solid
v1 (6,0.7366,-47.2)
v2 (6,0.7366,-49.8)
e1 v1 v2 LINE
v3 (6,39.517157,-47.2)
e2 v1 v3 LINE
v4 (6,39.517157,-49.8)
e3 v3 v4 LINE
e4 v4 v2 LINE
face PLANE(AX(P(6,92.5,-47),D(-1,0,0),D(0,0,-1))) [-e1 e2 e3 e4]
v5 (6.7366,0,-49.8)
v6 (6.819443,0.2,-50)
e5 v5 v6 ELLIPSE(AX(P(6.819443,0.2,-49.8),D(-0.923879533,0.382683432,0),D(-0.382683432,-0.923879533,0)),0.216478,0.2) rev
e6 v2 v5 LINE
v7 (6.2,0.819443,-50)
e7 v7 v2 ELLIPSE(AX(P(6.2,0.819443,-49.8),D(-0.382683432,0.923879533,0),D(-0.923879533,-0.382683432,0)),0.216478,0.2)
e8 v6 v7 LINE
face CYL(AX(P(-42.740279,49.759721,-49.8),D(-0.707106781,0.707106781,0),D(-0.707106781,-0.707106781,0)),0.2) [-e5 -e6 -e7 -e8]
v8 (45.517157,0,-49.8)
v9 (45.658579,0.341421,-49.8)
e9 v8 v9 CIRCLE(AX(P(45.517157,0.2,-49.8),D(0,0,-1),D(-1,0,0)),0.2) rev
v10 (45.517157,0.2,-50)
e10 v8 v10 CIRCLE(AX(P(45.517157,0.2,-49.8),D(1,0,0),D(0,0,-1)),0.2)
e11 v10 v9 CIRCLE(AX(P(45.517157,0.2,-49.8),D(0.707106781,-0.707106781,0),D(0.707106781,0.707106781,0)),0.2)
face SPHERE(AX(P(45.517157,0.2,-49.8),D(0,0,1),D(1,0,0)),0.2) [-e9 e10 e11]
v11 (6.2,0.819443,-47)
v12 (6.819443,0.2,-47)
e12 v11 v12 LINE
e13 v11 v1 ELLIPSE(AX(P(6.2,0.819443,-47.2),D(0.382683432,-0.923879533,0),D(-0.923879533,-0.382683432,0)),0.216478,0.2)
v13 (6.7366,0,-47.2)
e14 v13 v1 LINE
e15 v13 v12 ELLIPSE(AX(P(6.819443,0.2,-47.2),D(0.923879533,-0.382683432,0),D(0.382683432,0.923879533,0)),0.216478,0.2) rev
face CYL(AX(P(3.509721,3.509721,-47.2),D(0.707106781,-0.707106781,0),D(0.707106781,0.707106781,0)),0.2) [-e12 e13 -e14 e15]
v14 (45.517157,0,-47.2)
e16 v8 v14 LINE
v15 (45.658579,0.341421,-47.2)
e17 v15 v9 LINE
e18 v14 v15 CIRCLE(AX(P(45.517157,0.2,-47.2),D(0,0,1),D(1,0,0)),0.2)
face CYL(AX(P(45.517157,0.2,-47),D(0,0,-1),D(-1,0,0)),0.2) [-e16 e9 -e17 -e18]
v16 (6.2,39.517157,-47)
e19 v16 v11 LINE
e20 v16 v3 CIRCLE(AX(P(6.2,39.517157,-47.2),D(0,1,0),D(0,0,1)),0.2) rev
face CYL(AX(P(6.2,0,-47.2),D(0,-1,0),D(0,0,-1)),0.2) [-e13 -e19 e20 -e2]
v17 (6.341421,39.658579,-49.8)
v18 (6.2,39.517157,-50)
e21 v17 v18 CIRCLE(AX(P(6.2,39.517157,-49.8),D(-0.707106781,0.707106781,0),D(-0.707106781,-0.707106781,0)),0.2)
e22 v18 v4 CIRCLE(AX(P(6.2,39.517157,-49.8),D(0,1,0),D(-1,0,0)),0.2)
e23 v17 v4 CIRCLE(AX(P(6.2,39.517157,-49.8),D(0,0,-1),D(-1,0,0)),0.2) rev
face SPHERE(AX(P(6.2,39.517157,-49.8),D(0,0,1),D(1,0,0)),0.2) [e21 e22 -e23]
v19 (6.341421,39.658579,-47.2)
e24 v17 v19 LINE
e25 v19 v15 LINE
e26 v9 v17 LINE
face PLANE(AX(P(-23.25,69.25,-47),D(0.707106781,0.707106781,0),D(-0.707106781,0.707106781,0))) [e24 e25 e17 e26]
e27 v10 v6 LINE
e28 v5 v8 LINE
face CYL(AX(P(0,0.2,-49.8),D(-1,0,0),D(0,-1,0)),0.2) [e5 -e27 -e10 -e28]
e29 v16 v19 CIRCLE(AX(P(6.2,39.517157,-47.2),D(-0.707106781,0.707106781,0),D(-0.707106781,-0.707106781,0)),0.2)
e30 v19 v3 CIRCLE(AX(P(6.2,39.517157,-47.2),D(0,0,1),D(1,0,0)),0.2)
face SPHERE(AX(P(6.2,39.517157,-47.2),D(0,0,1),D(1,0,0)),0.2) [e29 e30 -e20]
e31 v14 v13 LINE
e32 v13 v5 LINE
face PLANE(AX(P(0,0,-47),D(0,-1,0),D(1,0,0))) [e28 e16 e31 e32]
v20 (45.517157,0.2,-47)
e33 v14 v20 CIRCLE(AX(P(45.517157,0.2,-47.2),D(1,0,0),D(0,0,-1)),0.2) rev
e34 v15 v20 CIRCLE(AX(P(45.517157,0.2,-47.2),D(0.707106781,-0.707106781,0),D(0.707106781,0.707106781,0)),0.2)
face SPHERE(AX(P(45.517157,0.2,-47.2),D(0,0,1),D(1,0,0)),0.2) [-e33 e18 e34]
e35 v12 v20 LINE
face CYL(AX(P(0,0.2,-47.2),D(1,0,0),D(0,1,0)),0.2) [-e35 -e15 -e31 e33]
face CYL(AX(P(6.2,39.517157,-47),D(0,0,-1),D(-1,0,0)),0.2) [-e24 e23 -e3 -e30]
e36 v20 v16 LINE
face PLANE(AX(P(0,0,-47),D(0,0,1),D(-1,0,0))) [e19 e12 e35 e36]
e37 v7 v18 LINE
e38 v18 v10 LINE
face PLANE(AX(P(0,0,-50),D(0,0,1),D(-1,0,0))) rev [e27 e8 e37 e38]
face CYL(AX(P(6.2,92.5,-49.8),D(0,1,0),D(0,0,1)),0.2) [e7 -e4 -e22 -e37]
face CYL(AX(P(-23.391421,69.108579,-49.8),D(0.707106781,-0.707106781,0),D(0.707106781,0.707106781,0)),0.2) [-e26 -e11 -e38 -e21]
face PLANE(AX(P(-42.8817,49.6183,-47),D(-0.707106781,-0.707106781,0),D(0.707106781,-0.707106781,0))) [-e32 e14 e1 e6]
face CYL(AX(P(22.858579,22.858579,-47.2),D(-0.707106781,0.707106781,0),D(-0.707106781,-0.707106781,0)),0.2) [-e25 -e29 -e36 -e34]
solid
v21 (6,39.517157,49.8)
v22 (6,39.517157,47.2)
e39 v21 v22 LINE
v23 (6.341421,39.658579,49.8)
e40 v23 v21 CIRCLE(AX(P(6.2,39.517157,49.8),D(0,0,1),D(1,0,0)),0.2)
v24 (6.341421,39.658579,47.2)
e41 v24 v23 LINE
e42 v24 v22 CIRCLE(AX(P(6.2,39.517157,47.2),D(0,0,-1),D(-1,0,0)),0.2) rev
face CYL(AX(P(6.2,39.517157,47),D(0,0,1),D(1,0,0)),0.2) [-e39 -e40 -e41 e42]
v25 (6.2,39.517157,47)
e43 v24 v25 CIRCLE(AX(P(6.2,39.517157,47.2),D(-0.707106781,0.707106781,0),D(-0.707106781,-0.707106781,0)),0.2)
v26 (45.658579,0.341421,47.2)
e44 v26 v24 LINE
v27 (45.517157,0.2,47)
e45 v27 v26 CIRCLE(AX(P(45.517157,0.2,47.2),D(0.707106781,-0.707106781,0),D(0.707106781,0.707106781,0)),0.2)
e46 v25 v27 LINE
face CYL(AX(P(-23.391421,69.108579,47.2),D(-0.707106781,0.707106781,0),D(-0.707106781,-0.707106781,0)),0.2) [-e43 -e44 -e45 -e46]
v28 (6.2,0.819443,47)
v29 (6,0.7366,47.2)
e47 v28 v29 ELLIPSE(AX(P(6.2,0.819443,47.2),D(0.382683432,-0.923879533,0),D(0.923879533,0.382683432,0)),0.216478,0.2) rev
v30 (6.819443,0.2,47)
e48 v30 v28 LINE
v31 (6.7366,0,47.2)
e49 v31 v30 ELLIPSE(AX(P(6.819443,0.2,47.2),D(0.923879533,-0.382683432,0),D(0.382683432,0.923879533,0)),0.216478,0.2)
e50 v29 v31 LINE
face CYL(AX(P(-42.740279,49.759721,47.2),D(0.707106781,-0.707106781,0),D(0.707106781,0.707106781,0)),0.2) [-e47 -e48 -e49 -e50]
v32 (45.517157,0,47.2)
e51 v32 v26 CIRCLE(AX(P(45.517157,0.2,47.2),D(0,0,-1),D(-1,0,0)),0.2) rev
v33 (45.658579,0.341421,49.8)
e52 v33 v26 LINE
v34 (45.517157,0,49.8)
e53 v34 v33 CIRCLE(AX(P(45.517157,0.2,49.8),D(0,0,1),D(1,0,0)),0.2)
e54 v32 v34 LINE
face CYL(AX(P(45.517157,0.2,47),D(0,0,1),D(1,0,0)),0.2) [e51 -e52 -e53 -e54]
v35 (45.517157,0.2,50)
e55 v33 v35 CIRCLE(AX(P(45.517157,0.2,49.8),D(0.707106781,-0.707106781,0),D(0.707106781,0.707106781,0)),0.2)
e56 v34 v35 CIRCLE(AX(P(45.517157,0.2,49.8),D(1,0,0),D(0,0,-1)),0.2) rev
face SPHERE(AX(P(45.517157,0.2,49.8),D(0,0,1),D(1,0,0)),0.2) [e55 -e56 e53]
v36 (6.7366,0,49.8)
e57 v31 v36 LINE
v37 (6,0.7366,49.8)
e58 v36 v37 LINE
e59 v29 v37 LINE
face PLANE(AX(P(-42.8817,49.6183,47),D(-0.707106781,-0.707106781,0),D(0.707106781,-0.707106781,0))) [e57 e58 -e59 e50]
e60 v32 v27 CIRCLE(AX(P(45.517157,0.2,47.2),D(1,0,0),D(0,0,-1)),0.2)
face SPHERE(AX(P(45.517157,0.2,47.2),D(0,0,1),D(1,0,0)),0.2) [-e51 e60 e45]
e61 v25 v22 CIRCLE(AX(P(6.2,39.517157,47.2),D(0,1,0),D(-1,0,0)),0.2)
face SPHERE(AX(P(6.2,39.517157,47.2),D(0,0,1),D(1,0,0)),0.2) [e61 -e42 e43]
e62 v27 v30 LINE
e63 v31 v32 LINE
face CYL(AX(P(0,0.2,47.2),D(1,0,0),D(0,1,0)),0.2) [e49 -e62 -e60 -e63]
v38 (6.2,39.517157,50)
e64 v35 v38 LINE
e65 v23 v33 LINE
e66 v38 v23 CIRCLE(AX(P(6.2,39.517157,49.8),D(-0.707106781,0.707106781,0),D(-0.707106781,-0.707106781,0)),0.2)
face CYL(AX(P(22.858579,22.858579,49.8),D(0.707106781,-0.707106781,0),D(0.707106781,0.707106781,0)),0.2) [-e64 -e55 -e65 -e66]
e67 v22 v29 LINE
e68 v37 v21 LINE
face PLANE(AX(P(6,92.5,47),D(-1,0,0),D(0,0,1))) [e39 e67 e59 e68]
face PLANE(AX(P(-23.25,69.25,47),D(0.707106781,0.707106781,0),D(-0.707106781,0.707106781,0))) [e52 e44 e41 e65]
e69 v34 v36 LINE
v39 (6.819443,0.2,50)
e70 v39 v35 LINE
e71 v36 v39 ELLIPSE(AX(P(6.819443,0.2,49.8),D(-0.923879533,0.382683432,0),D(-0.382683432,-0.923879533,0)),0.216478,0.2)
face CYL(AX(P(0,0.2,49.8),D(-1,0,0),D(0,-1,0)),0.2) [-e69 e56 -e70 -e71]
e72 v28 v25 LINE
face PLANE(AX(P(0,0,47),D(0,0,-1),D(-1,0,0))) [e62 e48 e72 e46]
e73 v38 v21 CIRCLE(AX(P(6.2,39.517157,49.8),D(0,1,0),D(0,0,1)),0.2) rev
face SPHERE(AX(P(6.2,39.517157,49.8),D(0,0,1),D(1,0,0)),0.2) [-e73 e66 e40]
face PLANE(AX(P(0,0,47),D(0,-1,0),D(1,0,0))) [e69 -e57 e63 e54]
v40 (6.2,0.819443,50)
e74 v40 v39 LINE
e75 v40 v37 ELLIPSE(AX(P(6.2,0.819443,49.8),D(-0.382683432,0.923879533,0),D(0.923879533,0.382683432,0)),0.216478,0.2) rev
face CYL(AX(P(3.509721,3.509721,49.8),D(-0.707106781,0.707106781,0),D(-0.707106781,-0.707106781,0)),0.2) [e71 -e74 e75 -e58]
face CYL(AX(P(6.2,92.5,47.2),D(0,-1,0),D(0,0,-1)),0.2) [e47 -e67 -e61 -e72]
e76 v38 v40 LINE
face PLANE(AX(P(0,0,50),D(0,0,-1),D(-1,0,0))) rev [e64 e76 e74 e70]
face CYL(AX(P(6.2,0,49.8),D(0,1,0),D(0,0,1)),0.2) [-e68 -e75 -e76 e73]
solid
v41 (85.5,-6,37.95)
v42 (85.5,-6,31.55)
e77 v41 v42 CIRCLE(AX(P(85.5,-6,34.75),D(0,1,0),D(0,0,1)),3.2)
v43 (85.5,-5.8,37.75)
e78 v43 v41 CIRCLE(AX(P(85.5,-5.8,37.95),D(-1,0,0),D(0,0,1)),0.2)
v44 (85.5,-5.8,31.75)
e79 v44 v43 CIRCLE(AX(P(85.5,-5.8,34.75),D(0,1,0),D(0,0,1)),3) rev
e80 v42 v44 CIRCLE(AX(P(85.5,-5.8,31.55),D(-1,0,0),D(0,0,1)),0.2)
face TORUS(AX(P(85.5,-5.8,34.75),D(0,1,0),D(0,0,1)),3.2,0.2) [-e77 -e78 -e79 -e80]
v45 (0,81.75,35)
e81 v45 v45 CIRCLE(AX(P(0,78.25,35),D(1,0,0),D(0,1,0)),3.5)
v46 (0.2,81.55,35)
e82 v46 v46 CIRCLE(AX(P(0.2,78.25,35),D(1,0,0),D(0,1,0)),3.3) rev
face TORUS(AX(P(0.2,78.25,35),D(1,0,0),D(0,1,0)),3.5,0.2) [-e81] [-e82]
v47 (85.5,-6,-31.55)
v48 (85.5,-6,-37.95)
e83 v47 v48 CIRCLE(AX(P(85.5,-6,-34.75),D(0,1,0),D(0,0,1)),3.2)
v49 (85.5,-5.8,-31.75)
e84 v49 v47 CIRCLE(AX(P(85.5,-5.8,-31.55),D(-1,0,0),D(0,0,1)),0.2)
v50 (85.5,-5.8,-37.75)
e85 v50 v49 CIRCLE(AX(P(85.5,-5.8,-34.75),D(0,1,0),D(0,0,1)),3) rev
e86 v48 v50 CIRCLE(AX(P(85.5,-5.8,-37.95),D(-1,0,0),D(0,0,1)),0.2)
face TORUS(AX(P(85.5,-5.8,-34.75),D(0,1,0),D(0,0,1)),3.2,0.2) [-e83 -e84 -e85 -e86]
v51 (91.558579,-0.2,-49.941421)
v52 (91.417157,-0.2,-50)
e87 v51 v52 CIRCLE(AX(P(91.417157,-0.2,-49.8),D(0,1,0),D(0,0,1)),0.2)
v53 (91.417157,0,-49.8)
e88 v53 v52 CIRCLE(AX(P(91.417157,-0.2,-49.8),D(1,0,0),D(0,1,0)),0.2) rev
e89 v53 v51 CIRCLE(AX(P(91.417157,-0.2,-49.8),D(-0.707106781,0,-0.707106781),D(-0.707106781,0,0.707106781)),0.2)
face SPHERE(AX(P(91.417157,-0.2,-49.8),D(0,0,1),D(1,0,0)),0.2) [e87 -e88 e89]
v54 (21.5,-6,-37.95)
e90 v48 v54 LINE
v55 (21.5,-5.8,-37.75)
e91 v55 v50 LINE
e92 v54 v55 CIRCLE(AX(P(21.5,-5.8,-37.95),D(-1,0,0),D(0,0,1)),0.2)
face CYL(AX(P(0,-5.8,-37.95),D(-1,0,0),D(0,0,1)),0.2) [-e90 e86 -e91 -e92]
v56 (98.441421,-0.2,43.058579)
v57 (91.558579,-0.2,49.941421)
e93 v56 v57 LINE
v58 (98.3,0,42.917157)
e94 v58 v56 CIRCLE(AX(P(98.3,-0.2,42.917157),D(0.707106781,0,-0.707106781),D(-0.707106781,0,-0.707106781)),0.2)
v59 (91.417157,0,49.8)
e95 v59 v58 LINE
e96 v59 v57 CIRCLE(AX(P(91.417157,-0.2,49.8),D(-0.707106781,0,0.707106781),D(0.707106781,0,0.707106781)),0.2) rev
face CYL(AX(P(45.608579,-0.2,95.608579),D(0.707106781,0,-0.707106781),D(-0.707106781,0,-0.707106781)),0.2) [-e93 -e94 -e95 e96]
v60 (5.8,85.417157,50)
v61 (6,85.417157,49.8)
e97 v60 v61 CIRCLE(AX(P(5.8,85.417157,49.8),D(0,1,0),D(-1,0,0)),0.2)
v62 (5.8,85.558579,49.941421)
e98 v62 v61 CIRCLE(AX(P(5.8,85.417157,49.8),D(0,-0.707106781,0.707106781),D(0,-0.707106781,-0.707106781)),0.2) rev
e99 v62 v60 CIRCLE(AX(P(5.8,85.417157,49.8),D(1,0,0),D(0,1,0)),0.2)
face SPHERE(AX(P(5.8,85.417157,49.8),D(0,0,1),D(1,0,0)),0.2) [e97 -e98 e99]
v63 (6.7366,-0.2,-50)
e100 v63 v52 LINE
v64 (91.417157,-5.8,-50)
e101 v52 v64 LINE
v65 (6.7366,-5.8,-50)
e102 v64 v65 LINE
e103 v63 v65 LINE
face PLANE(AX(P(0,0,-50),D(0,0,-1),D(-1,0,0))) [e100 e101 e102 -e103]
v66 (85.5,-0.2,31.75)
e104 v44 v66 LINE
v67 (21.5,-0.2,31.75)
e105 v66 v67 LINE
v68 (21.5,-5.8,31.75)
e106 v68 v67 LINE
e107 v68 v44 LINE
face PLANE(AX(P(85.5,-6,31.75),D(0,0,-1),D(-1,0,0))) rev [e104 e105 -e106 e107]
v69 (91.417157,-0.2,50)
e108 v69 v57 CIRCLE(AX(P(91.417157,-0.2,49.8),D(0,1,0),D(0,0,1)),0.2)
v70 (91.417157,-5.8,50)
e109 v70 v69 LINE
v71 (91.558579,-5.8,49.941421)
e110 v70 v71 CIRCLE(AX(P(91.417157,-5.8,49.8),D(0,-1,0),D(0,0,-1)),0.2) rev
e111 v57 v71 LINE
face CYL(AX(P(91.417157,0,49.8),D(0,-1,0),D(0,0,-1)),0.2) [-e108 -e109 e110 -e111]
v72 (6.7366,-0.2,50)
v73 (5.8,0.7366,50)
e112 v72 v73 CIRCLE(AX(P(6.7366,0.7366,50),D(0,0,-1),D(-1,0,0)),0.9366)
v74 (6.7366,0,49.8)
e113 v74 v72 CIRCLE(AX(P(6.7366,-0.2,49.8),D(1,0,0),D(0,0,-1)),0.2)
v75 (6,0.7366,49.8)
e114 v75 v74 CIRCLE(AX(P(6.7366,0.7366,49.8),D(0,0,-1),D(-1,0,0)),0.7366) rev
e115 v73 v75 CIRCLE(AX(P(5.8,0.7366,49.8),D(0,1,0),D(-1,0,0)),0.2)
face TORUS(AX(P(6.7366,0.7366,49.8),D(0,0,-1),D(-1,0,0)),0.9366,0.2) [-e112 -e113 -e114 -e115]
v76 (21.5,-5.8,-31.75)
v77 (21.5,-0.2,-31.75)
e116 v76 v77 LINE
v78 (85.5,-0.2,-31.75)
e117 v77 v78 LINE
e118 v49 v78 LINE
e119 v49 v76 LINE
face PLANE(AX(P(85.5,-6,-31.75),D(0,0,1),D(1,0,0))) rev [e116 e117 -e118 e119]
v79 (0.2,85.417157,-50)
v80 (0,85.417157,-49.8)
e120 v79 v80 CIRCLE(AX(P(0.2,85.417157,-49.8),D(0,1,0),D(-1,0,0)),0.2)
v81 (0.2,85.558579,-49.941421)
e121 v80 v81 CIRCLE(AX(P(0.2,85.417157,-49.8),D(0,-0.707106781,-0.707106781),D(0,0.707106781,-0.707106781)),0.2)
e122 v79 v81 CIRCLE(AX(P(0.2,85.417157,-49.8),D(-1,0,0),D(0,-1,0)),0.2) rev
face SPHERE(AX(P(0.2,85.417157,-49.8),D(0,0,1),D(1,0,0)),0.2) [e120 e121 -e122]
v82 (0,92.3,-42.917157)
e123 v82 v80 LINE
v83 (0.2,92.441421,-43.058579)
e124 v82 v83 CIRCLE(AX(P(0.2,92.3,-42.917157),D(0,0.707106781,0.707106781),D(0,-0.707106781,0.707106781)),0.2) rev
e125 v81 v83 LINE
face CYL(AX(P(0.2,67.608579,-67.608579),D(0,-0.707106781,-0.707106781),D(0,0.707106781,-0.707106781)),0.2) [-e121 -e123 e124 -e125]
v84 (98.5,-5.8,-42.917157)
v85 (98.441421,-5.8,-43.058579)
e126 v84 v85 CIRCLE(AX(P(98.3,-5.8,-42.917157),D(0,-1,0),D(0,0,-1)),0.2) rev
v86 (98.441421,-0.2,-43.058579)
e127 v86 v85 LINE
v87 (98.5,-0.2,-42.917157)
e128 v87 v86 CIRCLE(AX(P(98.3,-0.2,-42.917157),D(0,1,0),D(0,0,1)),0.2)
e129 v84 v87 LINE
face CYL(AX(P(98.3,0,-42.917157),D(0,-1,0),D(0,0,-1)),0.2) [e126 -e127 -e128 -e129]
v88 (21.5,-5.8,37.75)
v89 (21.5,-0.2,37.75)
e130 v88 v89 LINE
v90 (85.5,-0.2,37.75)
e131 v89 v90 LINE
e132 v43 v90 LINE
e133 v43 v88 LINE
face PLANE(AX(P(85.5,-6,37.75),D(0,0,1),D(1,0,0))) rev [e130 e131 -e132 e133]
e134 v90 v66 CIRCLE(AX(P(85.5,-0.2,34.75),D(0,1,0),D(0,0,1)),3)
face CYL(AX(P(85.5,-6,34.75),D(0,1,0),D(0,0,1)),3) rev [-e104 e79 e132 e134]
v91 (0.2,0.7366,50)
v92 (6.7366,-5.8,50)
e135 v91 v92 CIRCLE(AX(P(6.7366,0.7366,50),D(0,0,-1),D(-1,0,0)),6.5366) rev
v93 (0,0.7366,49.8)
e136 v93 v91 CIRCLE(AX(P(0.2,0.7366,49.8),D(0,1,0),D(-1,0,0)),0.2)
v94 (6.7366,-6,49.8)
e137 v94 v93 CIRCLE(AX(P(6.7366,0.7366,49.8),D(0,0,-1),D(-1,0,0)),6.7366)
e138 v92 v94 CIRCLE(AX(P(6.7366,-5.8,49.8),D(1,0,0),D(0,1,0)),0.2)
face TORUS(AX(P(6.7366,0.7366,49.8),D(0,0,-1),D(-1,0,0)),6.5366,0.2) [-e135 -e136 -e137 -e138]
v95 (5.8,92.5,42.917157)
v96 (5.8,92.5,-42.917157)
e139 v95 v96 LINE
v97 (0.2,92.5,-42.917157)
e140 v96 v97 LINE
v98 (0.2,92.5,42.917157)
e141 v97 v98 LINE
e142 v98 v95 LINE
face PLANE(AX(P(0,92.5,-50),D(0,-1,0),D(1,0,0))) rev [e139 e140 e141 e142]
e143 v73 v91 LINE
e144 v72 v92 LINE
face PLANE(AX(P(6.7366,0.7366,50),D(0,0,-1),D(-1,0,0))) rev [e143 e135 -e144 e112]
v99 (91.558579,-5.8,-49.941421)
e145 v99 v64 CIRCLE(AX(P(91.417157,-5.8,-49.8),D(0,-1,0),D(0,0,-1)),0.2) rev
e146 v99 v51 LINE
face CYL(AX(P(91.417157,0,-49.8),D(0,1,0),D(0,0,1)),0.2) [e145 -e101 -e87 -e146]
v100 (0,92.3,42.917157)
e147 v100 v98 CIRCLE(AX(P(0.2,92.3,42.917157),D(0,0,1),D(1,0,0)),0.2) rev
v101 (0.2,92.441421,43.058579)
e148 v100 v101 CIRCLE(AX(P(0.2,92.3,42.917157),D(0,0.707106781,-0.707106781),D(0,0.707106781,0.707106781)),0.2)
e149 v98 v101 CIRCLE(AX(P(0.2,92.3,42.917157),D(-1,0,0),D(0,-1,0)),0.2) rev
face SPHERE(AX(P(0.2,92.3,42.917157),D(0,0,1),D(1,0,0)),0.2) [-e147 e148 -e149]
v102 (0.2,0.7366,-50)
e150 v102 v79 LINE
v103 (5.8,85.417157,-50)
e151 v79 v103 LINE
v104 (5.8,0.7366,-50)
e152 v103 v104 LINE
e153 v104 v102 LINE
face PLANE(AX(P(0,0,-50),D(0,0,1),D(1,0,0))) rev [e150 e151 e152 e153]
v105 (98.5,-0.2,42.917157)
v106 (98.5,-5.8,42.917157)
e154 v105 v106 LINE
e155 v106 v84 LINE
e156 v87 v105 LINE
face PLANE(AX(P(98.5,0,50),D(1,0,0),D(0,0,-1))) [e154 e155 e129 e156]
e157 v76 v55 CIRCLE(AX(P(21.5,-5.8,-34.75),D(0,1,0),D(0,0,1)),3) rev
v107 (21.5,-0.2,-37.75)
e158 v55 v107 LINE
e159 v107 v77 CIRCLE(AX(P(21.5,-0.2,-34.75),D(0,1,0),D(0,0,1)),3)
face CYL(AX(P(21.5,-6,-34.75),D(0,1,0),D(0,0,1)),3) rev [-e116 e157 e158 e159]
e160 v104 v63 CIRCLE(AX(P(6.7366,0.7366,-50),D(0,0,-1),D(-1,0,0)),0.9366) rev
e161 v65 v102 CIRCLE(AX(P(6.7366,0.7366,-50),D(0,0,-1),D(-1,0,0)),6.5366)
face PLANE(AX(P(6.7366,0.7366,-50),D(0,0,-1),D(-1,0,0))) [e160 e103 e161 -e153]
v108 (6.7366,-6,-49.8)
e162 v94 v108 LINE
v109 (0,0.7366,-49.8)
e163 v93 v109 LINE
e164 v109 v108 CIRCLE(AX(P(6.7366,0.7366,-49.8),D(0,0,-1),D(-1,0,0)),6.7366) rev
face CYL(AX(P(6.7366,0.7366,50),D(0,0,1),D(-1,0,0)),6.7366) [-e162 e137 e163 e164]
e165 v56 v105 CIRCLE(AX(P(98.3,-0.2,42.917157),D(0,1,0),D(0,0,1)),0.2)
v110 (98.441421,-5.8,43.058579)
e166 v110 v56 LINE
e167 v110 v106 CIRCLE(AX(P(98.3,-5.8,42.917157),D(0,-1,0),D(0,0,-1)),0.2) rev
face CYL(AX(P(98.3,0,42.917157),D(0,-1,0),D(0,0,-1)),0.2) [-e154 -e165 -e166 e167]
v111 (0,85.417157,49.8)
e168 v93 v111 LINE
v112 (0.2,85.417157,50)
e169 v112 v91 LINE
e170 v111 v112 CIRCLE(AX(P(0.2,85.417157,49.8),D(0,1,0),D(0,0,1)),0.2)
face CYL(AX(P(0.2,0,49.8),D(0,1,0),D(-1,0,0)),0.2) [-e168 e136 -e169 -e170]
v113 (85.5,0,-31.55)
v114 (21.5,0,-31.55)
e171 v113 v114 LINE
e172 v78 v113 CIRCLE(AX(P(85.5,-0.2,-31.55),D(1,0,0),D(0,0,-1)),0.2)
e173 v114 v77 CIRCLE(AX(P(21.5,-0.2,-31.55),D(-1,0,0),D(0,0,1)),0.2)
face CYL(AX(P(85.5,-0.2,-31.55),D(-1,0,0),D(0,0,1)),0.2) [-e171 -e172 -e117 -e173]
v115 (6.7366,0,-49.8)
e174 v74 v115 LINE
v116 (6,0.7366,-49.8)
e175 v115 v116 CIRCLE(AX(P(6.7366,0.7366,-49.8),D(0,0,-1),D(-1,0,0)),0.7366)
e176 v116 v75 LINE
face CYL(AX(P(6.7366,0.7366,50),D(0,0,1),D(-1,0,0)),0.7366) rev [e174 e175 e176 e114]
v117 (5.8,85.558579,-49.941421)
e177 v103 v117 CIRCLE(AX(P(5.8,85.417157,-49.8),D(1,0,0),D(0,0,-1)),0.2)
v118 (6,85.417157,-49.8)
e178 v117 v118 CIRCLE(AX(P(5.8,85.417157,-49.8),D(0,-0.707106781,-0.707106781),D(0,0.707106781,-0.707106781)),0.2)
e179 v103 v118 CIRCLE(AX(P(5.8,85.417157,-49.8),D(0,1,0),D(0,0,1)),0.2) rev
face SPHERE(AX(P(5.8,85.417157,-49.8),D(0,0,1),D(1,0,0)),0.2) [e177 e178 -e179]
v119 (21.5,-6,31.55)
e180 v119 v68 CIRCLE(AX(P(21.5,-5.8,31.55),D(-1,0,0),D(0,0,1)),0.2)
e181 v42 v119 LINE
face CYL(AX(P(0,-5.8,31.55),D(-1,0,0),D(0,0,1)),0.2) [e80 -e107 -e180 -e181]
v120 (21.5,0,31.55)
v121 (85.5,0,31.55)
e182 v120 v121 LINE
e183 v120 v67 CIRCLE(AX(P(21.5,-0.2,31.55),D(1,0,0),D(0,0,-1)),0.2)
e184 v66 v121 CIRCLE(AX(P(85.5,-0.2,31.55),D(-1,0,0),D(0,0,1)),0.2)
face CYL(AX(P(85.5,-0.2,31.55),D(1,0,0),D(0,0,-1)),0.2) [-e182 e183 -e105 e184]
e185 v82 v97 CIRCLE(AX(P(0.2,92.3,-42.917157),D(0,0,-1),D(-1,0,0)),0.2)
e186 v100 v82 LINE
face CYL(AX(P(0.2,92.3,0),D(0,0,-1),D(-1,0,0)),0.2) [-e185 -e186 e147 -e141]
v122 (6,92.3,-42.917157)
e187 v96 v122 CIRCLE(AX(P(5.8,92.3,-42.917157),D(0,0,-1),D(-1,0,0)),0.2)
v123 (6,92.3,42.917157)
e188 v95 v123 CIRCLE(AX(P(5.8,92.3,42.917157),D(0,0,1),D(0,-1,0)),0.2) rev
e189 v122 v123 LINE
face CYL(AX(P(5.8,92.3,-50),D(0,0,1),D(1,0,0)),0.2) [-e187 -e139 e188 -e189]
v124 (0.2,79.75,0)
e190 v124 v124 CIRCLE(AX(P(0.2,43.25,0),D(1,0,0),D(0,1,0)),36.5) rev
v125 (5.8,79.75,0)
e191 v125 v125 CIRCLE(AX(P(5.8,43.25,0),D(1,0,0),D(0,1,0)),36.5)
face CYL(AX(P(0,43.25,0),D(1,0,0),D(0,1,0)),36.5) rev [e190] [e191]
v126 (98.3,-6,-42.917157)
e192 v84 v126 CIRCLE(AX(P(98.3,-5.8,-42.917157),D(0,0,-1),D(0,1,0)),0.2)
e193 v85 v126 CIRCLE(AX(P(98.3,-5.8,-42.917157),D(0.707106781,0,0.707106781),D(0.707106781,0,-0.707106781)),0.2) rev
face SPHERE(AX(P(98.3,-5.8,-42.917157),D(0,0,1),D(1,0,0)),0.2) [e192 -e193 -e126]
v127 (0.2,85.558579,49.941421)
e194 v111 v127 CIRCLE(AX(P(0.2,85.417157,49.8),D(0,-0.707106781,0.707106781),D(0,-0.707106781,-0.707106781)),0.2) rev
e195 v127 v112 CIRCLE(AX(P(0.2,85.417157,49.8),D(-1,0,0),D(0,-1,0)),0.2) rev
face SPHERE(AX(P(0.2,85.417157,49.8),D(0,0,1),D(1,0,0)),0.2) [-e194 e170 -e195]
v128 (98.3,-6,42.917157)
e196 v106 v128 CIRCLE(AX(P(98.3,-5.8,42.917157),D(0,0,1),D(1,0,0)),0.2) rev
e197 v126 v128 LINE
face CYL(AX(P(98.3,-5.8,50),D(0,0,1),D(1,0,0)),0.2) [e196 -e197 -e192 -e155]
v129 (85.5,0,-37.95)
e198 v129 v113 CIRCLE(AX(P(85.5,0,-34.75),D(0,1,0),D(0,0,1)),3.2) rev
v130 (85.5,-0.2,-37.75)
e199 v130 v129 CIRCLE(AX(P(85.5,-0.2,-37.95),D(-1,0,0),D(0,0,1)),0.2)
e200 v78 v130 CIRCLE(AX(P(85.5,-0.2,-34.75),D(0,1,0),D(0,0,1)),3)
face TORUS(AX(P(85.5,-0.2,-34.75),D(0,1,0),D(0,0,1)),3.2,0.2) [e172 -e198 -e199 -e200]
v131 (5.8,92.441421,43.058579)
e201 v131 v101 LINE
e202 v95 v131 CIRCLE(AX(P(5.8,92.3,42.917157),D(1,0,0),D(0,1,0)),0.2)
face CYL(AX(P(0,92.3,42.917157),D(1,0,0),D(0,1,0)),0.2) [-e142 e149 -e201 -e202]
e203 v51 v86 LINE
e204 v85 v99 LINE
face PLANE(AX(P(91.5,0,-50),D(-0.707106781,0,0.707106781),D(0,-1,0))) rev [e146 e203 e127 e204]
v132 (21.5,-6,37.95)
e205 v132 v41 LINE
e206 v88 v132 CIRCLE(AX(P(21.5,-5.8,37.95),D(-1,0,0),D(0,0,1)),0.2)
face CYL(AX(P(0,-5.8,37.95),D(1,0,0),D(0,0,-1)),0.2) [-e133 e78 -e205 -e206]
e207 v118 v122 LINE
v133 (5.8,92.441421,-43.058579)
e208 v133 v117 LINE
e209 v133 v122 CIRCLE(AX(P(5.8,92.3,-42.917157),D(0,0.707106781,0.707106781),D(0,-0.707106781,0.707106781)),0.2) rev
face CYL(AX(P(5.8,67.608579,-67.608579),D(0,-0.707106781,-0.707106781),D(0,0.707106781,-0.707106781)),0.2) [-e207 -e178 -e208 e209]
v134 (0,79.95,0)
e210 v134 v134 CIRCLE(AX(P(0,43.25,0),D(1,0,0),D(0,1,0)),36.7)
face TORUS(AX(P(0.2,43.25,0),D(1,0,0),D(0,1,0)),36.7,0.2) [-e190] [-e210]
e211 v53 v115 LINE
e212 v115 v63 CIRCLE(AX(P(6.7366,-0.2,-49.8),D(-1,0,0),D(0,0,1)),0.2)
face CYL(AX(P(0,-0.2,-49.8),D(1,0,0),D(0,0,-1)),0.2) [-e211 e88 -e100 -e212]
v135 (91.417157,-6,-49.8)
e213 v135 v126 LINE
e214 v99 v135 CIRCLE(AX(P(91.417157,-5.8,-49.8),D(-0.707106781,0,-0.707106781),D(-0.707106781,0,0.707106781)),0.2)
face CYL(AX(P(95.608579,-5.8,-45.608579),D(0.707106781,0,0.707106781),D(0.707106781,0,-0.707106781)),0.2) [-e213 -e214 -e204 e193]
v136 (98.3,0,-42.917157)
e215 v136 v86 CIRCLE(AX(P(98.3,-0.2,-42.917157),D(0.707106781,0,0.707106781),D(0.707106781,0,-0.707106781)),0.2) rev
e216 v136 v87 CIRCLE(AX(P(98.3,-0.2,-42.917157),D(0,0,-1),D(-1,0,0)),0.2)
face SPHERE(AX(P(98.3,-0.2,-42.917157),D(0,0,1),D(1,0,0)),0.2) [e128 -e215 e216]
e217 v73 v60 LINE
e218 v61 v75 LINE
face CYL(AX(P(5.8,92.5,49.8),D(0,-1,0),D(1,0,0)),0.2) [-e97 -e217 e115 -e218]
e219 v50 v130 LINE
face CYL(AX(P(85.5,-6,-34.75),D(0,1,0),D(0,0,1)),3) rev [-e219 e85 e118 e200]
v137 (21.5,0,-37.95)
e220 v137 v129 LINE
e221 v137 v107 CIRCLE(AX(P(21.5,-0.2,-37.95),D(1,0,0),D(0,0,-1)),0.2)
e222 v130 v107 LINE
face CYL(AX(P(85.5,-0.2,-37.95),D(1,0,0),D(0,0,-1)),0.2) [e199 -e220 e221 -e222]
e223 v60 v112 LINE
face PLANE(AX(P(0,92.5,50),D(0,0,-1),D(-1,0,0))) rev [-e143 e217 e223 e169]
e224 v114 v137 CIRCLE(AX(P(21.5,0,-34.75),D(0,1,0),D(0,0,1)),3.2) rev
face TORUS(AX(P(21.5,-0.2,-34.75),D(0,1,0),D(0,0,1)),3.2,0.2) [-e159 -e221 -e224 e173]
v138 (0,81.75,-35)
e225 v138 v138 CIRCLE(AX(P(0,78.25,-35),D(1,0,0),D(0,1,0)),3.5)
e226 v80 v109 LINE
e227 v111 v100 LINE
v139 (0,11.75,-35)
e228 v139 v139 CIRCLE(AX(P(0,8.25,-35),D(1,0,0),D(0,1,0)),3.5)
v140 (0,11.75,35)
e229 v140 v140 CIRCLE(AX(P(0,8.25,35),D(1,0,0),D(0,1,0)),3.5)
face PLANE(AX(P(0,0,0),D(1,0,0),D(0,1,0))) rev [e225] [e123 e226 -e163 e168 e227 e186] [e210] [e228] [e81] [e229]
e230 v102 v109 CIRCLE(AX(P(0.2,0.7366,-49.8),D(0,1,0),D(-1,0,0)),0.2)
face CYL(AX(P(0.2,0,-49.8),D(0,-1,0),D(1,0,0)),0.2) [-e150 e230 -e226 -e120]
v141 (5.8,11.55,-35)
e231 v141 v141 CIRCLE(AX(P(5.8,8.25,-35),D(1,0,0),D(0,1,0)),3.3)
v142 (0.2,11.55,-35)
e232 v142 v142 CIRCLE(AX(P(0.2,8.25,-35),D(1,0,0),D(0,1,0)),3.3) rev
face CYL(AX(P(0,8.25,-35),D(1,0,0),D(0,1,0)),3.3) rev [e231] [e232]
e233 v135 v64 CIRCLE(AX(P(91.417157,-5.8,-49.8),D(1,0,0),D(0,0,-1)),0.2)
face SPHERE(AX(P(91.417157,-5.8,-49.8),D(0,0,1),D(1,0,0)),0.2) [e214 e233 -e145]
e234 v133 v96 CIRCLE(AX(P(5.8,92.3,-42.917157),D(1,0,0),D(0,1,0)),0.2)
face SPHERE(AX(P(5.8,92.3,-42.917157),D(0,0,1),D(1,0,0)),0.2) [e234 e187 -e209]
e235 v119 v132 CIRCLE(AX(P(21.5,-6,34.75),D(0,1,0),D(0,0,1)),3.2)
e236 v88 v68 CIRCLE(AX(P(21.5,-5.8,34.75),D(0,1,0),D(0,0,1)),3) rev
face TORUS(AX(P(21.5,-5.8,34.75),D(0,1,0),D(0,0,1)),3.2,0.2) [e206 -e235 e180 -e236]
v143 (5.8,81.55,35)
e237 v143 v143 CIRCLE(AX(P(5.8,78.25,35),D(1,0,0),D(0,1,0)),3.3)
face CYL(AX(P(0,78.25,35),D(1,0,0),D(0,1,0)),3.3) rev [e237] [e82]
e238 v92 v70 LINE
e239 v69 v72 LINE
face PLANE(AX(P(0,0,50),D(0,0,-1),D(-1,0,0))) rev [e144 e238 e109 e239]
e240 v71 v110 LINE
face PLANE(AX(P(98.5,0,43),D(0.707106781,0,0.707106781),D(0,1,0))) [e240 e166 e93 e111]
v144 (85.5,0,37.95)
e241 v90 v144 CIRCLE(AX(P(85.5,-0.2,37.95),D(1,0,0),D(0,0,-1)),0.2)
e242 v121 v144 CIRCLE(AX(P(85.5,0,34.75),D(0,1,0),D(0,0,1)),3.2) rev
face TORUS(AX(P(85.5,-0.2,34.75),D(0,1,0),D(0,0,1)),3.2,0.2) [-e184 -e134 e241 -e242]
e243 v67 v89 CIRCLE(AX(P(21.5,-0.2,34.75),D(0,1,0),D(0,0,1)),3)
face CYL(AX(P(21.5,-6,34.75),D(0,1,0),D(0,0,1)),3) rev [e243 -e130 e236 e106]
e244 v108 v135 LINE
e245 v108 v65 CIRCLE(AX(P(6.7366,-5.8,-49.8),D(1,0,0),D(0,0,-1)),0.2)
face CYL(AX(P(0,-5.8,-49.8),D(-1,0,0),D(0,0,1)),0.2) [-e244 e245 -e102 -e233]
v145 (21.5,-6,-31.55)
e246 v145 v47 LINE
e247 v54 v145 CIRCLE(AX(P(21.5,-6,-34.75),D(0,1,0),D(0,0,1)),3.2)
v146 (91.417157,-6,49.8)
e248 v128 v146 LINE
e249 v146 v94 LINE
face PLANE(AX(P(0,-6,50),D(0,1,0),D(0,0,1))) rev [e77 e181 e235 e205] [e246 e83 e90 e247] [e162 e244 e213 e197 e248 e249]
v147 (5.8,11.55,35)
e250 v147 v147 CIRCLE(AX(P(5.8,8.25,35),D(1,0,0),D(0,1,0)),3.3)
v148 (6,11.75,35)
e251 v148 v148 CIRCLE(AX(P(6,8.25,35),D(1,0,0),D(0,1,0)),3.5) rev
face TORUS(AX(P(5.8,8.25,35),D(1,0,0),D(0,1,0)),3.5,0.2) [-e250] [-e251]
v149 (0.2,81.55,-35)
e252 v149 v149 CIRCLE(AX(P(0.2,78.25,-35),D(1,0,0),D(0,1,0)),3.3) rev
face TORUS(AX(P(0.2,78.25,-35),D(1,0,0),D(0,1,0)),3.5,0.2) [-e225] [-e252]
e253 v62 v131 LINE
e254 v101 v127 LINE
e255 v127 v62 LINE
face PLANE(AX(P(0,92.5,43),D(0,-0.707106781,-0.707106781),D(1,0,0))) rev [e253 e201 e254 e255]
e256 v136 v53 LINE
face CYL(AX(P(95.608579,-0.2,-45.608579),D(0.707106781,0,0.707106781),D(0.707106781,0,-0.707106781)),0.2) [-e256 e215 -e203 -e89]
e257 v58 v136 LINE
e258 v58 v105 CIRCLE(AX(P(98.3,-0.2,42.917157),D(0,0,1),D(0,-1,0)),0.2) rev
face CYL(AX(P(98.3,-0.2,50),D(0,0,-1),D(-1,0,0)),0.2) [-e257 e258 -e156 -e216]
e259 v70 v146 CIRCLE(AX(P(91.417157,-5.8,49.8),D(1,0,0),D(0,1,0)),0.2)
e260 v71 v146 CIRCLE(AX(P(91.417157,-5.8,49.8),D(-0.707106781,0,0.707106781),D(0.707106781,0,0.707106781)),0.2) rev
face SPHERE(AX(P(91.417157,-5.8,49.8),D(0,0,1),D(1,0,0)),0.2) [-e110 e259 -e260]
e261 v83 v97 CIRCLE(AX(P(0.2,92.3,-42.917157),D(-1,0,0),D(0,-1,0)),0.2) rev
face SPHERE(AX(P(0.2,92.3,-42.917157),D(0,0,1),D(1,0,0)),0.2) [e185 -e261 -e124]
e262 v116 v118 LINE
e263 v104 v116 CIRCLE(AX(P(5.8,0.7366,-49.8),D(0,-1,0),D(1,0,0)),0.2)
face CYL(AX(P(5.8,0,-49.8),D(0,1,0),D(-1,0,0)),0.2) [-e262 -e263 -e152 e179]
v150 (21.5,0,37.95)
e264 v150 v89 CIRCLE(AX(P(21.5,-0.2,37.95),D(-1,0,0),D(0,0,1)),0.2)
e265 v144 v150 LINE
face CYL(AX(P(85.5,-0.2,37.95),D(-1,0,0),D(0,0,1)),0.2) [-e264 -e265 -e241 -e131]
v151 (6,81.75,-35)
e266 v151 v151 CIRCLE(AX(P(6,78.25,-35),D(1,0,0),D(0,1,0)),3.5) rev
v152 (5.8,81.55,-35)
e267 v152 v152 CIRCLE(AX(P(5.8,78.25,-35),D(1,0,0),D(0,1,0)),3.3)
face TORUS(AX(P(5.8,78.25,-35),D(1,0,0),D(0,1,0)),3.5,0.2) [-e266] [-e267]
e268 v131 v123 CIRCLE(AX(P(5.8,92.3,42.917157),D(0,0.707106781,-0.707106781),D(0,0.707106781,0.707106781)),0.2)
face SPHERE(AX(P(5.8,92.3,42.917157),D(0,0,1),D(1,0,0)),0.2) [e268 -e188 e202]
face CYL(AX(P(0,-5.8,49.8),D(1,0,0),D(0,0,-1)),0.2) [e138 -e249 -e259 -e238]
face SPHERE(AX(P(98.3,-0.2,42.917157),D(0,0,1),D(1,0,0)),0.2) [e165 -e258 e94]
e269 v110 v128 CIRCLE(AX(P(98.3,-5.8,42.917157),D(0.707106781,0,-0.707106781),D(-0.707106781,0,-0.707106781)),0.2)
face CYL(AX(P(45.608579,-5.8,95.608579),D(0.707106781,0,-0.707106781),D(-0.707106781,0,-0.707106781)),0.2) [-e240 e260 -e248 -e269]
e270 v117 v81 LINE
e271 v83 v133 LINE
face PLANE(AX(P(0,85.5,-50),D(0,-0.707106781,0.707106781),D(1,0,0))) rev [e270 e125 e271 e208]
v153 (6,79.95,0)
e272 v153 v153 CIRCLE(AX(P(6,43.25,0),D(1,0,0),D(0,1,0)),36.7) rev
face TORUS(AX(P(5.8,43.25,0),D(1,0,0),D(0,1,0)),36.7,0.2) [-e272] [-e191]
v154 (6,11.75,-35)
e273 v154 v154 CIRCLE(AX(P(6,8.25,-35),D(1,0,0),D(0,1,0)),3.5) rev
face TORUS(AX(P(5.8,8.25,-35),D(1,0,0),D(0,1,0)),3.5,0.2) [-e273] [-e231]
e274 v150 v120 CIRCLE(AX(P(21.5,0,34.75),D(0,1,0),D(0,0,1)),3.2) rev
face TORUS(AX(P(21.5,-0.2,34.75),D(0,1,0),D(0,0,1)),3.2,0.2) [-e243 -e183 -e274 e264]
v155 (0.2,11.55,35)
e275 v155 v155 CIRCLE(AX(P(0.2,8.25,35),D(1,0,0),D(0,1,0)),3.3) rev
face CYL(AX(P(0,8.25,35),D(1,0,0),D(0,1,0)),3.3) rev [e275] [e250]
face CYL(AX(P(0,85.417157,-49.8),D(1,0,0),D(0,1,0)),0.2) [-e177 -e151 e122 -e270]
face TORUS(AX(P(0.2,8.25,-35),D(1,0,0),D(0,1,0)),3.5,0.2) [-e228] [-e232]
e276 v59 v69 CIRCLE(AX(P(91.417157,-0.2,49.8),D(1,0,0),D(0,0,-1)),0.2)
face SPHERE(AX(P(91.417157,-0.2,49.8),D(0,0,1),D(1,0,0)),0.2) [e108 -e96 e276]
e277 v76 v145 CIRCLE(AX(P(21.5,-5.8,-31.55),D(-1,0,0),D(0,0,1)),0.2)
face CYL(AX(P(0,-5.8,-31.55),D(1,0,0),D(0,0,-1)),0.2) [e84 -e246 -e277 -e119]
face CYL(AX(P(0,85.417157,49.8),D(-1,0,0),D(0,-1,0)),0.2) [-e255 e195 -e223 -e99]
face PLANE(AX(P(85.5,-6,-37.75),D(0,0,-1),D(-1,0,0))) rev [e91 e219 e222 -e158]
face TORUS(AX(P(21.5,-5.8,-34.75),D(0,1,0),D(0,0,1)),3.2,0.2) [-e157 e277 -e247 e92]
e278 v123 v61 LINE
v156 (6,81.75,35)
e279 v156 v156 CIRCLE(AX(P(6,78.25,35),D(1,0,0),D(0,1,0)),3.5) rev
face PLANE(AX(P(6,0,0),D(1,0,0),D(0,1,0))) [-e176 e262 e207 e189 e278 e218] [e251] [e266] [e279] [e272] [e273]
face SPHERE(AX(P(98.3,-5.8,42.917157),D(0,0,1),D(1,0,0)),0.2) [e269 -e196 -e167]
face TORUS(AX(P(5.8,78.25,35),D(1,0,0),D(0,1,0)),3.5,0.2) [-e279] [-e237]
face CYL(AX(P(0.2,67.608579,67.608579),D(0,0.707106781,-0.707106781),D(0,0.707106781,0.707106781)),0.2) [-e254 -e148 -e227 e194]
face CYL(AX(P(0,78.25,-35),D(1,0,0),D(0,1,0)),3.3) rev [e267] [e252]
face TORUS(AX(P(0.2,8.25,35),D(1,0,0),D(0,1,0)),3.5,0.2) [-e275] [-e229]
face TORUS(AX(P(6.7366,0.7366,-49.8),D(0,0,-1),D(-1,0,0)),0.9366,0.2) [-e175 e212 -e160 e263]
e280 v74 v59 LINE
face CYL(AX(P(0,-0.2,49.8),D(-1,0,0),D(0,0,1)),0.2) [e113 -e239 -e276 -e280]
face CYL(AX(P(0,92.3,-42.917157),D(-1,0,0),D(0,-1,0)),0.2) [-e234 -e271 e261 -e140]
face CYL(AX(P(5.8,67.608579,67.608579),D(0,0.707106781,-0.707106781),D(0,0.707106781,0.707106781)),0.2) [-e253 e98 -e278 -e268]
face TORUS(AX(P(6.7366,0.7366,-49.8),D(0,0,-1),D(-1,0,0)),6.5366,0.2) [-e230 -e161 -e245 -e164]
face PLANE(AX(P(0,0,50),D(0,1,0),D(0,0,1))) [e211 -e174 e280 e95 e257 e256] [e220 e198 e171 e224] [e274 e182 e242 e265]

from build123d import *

# Parameters (mm, degrees)
SCHIZZO1_W                     = 98.5
SCHIZZO1_H                     = 6
BASE_FLANGIA1_DEPTH            = 50
BORDO_FLANGIA1_STRIP_W         = 25.4732
BORDO_FLANGIA1_STRIP_H         = 6
BORDO_FLANGIA1_STRIP_CUT_DEPTH = 100
BORDO_FLANGIA1_DEPTH           = 100
SCHIZZO10_R                    = 36.5
SCHIZZO10_R_2                  = 3.3
TAGLIO_ESTRUSIONE1_DEPTH       = 141.044635742
TAGLIO_ESTRUSIONE3_DEPTH       = 145.078103819
ESTRUSIONE_ESTRUSIONE3_START   = 50
ESTRUSIONE_ESTRUSIONE3_DEPTH   = 3
SMUSSO1_SIZE                   = 7
RACCORDO1_R                    = 0.2
RACCORDO2_R                    = 0.2
RACCORDO3_R                    = 0.2


# Sheet-metal steps are written as plain solids
with BuildPart() as part:
    # Schizzo1 → Base-Flangia1 (new, symmetric)
    with BuildSketch(Plane.XY):
        with Locations((49.25, -3)):
            Rectangle(SCHIZZO1_W, SCHIZZO1_H)
    extrude(amount=BASE_FLANGIA1_DEPTH, both=True)

    # Bordo-Flangia1 strip (across the edge) → Bordo-Flangia1 strip cut (cut)
    with BuildSketch(Plane.XY.offset(-50)):
        with Locations((-6, -3)):
            Rectangle(BORDO_FLANGIA1_STRIP_W, BORDO_FLANGIA1_STRIP_H)
    extrude(amount=BORDO_FLANGIA1_STRIP_CUT_DEPTH, mode=Mode.SUBTRACT)

    # Bordo-Flangia1 section (across the edge) → Bordo-Flangia1 (add)
    with BuildSketch(Plane.XY.offset(-50)):
        with BuildLine():
            Line((0, 0.7366), (0, 92.5))
            Line((0, 92.5), (6, 92.5))
            Line((6, 92.5), (6, 0.7366))
            ThreePointArc((6, 0.7366), (6.215745145, 0.215745145), (6.7366, 0))
            Line((6.7366, 0), (6.7366, -6))
            ThreePointArc((6.7366, -6), (1.973104458, -4.026895542), (0, 0.7366))
        make_face()
    extrude(amount=BORDO_FLANGIA1_DEPTH)

    # Schizzo10 → Taglio-Estrusione1 (cut, through all)
    with BuildSketch(Plane(origin=(6, 0, 0), x_dir=(0, 0, -1), z_dir=(1, 0, 0))):
        with Locations(Location((0, 43.25, 0), (0, 0, 90))):
            Circle(SCHIZZO10_R)
        with Locations(Location((-35, 78.25, 0), (0, 0, 90))):
            Circle(SCHIZZO10_R_2)
        with Locations(Location((35, 78.25, 0), (0, 0, 270))):
            Circle(SCHIZZO10_R_2)
        with Locations(Location((-35, 8.25, 0), (0, 0, 270))):
            Circle(SCHIZZO10_R_2)
        with Locations(Location((35, 8.25, 0), (0, 0, 90))):
            Circle(SCHIZZO10_R_2)
    extrude(amount=-TAGLIO_ESTRUSIONE1_DEPTH, mode=Mode.SUBTRACT)

    # Schizzo12 → Taglio-Estrusione3 (cut, through all)
    with BuildSketch(Plane(origin=(0, 0, 0), x_dir=(1, 0, 0), z_dir=(0, 1, 0))):
        with BuildLine():
            Line((85.5, 31.75), (21.5, 31.75))
            ThreePointArc((21.5, 31.75), (18.5, 34.75), (21.5, 37.75))
            Line((21.5, 37.75), (85.5, 37.75))
            ThreePointArc((85.5, 37.75), (88.5, 34.75), (85.5, 31.75))
        make_face()
        with BuildLine():
            Line((85.5, -37.75), (21.5, -37.75))
            ThreePointArc((21.5, -37.75), (18.5, -34.75), (21.5, -31.75))
            Line((21.5, -31.75), (85.5, -31.75))
            ThreePointArc((85.5, -31.75), (88.5, -34.75), (85.5, -37.75))
        make_face()
    extrude(amount=-TAGLIO_ESTRUSIONE3_DEPTH, mode=Mode.SUBTRACT)

    # Smusso1
    smusso1_edges = [part.edges().sort_by_distance(p)[0] for p in [
        (3, 92.5, -50),
        (3, 92.5, 50),
        (98.5, -3, -50),
        (98.5, -3, 50),
    ]]
    chamfer(smusso1_edges, length=SMUSSO1_SIZE)

    # Raccordo1
    raccordo1_edges = [part.edges().sort_by_distance(p)[0] for p in [
        (98.5, 0, 0),
        (98.5, -6, 0),
        (98.5, -3, -43),
        (98.5, -3, 43),
        (95, -6, -46.5),
        (95, -6, 46.5),
        (91.5, -3, 50),
        (95, 0, -46.5),
        (95, 0, 46.5),
        (91.5, -3, -50),
        (0, 43.1183, -50),
        (6, 43.1183, -50),
        (3, 85.5, -50),
        (6, 92.5, 0),
        (49.1183, -6, -50),
        (6, 89, 46.5),
        (6, 89, -46.5),
        (0, 92.5, 0),
        (3, 92.5, 43),
        (3, 92.5, -43),
        (49.1183, 0, -50),
        (0, 89, 46.5),
        (0, 89, -46.5),
        (3, 85.5, 50),
        (49.1183, -6, 50),
        (49.1183, 0, 50),
        (1.973104458, -4.026895542, -50),
        (1.973104458, -4.026895542, 50),
        (6.215745145, 0.215745145, -50),
        (6.215745145, 0.215745145, 50),
        (6, 43.1183, 50),
        (0, 43.1183, 50),
        (0, 4.95, -35),
        (6, 4.95, -35),
        (0, 11.55, 35),
        (6, 11.55, 35),
        (0, 81.55, -35),
        (6, 81.55, -35),
        (0, 74.95, 35),
        (6, 74.95, 35),
        (0, 6.75, 0),
        (6, 6.75, 0),
        (88.5, -6, -34.75),
        (53.5, -6, -31.75),
        (18.5, -6, -34.75),
        (53.5, -6, -37.75),
        (88.5, 0, -34.75),
        (53.5, 0, -37.75),
        (18.5, 0, -34.75),
        (53.5, 0, -31.75),
        (88.5, -6, 34.75),
        (53.5, -6, 37.75),
        (18.5, -6, 34.75),
        (53.5, -6, 31.75),
        (88.5, 0, 34.75),
        (53.5, 0, 31.75),
        (18.5, 0, 34.75),
        (53.5, 0, 37.75),
    ]]
    fillet(raccordo1_edges, radius=RACCORDO1_R)


with BuildPart() as body_2:
    # Schizzo15 → Estrusione-Estrusione3 (new body)
    with BuildSketch(Plane.XY.offset(ESTRUSIONE_ESTRUSIONE3_START)):
        Polygon((6, 40), (46, 0), (6.7366, 0), (6, 0.7366), align=None)
    extrude(amount=-ESTRUSIONE_ESTRUSIONE3_DEPTH)


with BuildPart() as body_3:
    # Specchia5: mirrored copy
    add(body_2.part.mirror(Plane.XY))

    # Raccordo2
    raccordo2_edges = [body_3.edges().sort_by_distance(p)[0] for p in [
        (6, 20.3683, -47),
        (6.3683, 0.3683, -47),
        (26.3683, 0, -47),
        (6.3683, 0.3683, -50),
        (6, 20.3683, -50),
        (26, 20, -50),
        (26.3683, 0, -50),
        (26, 20, -47),
        (6, 40, -48.5),
        (46, 0, -48.5),
    ]]
    fillet(raccordo2_edges, radius=RACCORDO2_R)


with BuildPart() as body_2_1:
    add(body_2.part)

    # Raccordo3
    raccordo3_edges = [body_2_1.edges().sort_by_distance(p)[0] for p in [
        (6, 20.3683, 47),
        (6.3683, 0.3683, 47),
        (26.3683, 0, 47),
        (6.3683, 0.3683, 50),
        (6, 20.3683, 50),
        (26, 20, 50),
        (26.3683, 0, 50),
        (26, 20, 47),
        (6, 40, 48.5),
        (46, 0, 48.5),
    ]]
    fillet(raccordo3_edges, radius=RACCORDO3_R)


solid = Compound([part.part, body_3.part, body_2_1.part])
